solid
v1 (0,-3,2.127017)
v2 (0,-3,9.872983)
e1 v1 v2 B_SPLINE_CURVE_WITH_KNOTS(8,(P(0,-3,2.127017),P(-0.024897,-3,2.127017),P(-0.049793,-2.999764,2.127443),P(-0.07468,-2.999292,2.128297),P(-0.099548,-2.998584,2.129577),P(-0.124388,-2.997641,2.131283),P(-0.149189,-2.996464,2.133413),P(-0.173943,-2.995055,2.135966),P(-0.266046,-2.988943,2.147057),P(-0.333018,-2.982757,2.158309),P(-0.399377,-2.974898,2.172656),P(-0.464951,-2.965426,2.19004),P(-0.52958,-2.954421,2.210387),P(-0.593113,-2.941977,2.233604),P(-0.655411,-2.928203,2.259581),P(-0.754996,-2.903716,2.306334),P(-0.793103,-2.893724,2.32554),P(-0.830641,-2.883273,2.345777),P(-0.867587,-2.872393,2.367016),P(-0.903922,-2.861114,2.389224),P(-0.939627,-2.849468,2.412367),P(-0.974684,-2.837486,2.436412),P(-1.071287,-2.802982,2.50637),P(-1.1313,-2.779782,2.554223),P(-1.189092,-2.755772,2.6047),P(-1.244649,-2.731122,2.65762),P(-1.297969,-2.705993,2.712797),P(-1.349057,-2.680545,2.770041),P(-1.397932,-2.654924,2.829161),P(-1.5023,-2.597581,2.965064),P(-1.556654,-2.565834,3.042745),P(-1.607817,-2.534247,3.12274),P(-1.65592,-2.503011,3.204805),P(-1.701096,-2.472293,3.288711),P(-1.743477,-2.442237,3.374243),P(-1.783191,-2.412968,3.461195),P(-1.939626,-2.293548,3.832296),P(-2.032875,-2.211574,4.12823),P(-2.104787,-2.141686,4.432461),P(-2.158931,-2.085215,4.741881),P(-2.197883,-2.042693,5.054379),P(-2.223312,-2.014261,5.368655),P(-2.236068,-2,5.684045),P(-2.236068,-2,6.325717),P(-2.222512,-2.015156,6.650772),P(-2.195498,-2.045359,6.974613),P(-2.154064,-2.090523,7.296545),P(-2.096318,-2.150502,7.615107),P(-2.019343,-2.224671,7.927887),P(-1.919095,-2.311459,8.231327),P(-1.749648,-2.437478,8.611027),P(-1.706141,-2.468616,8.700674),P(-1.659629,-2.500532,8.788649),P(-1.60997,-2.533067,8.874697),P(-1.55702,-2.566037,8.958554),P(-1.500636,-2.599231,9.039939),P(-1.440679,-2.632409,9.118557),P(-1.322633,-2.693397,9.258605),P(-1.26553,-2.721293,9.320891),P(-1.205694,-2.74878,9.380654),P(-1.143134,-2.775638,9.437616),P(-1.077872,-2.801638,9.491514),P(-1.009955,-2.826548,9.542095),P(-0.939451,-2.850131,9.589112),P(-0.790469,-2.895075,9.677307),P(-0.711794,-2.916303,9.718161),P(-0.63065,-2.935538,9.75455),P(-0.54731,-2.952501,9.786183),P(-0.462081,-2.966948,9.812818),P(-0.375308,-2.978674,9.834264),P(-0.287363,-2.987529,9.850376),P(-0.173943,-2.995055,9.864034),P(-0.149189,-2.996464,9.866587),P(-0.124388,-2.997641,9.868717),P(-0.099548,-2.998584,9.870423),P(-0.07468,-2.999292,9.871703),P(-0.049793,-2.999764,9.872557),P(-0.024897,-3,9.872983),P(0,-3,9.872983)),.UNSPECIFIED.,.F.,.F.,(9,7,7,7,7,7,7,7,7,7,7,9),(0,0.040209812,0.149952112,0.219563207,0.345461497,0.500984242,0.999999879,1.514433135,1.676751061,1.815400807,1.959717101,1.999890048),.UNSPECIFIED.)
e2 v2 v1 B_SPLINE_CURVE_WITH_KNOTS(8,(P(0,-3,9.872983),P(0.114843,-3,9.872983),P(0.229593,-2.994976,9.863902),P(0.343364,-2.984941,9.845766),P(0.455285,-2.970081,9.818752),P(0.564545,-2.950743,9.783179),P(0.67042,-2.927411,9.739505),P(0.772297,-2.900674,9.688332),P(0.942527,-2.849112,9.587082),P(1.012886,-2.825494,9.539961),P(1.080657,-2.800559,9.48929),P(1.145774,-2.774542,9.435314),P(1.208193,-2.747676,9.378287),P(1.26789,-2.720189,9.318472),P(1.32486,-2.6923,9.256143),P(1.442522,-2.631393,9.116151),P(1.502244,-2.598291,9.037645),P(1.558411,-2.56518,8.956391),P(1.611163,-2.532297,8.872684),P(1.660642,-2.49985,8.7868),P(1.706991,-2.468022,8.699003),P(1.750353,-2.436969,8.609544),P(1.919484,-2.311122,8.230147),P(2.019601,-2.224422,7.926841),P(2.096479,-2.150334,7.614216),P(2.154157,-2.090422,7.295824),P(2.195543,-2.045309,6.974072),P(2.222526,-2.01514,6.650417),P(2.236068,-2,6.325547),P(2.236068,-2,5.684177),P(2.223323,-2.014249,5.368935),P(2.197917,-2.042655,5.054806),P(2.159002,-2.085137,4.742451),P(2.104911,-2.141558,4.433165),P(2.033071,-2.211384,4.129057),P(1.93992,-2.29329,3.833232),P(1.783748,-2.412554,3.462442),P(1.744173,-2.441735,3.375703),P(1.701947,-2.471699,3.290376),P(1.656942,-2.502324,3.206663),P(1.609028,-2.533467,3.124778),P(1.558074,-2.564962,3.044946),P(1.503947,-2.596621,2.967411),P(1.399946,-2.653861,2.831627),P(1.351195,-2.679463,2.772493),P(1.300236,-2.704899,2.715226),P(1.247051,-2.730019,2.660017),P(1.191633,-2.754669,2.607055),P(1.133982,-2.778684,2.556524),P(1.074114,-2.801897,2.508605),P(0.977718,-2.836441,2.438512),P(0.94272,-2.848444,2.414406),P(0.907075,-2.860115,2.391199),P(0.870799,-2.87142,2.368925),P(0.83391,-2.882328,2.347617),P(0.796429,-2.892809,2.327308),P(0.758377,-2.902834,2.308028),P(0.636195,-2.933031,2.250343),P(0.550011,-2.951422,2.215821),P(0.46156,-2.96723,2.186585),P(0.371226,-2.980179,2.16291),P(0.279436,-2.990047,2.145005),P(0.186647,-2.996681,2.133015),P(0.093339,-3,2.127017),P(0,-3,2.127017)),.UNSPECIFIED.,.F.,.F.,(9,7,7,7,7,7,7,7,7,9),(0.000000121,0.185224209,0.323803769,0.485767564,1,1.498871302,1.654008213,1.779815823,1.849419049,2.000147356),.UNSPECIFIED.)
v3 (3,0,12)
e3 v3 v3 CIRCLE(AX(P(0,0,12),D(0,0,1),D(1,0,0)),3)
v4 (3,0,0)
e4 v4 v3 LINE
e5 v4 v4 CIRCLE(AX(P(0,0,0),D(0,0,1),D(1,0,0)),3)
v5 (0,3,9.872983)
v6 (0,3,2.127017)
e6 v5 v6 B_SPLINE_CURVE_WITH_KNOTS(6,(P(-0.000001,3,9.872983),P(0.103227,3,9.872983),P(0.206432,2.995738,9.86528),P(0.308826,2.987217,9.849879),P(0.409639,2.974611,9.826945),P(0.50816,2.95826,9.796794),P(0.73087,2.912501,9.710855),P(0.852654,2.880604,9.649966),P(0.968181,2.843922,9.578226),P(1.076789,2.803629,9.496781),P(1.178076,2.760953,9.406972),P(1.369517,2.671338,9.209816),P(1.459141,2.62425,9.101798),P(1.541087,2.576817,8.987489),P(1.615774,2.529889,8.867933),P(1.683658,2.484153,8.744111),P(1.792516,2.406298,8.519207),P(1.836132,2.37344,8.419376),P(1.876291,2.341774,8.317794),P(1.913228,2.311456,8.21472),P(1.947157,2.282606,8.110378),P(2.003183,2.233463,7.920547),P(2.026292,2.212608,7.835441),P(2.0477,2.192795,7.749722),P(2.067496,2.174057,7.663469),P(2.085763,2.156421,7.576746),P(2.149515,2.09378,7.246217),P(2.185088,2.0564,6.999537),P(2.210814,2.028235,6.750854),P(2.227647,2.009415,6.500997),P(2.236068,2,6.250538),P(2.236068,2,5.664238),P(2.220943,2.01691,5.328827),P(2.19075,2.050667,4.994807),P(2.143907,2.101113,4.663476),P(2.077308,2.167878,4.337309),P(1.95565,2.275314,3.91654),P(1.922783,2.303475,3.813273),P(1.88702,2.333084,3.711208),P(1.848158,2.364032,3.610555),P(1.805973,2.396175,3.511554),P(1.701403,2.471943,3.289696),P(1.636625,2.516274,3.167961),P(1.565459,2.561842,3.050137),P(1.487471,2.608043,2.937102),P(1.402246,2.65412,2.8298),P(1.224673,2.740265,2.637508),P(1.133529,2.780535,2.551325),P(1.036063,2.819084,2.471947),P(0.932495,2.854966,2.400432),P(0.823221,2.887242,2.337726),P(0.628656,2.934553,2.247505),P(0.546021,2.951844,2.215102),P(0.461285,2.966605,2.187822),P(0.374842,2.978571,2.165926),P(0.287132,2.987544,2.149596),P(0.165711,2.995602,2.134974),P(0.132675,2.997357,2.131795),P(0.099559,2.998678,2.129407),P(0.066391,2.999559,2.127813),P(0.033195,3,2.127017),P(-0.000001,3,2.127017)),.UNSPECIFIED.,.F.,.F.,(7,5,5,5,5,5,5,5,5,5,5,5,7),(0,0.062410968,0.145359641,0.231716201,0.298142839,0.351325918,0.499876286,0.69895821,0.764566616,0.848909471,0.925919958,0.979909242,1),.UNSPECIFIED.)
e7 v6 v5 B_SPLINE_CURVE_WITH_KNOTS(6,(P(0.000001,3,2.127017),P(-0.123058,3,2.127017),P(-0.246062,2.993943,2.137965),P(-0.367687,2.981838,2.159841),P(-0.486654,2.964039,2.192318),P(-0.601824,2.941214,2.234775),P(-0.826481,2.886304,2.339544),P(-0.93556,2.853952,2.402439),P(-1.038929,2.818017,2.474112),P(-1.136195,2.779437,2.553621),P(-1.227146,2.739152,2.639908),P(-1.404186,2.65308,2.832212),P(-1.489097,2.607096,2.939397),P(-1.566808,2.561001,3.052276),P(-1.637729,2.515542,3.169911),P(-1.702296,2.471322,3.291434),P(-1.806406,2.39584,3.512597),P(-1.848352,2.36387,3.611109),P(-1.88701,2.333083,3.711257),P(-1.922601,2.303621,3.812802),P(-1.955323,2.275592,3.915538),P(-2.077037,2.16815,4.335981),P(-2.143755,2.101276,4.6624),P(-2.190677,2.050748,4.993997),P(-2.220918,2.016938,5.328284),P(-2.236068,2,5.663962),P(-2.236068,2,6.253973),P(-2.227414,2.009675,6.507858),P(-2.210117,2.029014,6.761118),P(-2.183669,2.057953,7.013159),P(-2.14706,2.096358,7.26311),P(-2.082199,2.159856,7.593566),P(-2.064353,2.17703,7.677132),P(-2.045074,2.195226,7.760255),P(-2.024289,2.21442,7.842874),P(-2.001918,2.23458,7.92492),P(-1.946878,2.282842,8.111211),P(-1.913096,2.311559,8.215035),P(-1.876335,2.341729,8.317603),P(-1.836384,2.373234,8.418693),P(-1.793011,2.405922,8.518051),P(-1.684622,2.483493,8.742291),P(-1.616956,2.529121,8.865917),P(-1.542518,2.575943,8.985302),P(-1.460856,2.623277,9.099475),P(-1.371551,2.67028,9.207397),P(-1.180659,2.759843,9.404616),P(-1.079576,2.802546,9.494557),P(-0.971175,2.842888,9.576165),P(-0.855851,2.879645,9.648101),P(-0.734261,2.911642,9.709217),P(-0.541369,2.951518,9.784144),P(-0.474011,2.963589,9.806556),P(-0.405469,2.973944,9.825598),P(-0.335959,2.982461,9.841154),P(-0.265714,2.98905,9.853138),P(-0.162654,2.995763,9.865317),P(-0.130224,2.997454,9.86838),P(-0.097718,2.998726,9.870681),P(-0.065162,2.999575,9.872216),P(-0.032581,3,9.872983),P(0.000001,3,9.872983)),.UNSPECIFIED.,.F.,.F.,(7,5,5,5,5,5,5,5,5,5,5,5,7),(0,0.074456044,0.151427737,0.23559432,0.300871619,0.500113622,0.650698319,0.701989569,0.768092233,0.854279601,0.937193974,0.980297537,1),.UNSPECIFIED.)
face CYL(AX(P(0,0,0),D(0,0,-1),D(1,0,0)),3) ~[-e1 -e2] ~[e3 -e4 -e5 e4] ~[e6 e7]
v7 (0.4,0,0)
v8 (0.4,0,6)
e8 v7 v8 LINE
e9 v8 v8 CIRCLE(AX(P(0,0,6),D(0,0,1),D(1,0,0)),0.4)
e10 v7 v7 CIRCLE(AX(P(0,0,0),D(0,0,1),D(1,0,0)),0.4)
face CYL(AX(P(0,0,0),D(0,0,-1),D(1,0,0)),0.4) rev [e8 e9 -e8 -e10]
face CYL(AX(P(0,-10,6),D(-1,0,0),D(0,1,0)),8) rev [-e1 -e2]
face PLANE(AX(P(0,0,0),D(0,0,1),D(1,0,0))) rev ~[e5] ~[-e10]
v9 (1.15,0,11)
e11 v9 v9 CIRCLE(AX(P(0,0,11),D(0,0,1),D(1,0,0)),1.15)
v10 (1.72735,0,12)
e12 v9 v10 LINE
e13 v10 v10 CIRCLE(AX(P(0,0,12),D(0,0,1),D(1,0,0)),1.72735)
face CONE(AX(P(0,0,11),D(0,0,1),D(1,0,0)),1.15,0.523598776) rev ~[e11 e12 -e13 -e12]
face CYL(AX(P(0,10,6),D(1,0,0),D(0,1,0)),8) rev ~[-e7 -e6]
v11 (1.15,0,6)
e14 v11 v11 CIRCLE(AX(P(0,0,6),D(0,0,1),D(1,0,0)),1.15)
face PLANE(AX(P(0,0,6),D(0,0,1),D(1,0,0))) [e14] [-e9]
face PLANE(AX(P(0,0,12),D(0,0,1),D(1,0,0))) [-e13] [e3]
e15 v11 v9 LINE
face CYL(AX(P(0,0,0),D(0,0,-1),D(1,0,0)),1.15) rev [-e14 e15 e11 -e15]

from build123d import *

# Parameters (mm, degrees)
F0_R          = 1.15
F0_R_2        = 0.4
F1_DEPTH      = 6
F0_R_3        = 3
F2_DEPTH      = 12
F3_SIZE2      = 0.5773502692
F3_SIZE       = 1
F4_R          = 8
F5_DEPTH      = 25
F5_DEPTH_BACK = 25


with BuildPart() as f1:
    # F0 (on Top) → F1 (new body)
    with BuildSketch(Plane.XY):
        Circle(F0_R)
        Circle(F0_R_2, mode=Mode.SUBTRACT)
    extrude(amount=F1_DEPTH)

    # F0 (on Top) → F2 (join)
    with BuildSketch(Plane.XY):
        Circle(F0_R_3)
        Circle(F0_R, mode=Mode.SUBTRACT)
    extrude(amount=F2_DEPTH)

    # F3
    f3_edges = [f1.edges().sort_by_distance(p)[0] for p in [
        (-1.15, 0, 12),
    ]]
    f3_side = f1.faces().sort_by_distance((-1.15, 0, 9))[0]
    chamfer(f3_edges, length=F3_SIZE, length2=F3_SIZE2, reference=f3_side)

    # F4 (on Right) → F5 (cut, two sides)
    with BuildSketch(Plane.YZ) as f5_sk:
        with Locations((10, 6)):
            Circle(F4_R)
        with Locations((-10, 6)):
            Circle(F4_R)
    extrude(amount=-F5_DEPTH, mode=Mode.SUBTRACT)
    extrude(f5_sk.sketch, amount=F5_DEPTH_BACK, mode=Mode.SUBTRACT)


solid = f1.part
